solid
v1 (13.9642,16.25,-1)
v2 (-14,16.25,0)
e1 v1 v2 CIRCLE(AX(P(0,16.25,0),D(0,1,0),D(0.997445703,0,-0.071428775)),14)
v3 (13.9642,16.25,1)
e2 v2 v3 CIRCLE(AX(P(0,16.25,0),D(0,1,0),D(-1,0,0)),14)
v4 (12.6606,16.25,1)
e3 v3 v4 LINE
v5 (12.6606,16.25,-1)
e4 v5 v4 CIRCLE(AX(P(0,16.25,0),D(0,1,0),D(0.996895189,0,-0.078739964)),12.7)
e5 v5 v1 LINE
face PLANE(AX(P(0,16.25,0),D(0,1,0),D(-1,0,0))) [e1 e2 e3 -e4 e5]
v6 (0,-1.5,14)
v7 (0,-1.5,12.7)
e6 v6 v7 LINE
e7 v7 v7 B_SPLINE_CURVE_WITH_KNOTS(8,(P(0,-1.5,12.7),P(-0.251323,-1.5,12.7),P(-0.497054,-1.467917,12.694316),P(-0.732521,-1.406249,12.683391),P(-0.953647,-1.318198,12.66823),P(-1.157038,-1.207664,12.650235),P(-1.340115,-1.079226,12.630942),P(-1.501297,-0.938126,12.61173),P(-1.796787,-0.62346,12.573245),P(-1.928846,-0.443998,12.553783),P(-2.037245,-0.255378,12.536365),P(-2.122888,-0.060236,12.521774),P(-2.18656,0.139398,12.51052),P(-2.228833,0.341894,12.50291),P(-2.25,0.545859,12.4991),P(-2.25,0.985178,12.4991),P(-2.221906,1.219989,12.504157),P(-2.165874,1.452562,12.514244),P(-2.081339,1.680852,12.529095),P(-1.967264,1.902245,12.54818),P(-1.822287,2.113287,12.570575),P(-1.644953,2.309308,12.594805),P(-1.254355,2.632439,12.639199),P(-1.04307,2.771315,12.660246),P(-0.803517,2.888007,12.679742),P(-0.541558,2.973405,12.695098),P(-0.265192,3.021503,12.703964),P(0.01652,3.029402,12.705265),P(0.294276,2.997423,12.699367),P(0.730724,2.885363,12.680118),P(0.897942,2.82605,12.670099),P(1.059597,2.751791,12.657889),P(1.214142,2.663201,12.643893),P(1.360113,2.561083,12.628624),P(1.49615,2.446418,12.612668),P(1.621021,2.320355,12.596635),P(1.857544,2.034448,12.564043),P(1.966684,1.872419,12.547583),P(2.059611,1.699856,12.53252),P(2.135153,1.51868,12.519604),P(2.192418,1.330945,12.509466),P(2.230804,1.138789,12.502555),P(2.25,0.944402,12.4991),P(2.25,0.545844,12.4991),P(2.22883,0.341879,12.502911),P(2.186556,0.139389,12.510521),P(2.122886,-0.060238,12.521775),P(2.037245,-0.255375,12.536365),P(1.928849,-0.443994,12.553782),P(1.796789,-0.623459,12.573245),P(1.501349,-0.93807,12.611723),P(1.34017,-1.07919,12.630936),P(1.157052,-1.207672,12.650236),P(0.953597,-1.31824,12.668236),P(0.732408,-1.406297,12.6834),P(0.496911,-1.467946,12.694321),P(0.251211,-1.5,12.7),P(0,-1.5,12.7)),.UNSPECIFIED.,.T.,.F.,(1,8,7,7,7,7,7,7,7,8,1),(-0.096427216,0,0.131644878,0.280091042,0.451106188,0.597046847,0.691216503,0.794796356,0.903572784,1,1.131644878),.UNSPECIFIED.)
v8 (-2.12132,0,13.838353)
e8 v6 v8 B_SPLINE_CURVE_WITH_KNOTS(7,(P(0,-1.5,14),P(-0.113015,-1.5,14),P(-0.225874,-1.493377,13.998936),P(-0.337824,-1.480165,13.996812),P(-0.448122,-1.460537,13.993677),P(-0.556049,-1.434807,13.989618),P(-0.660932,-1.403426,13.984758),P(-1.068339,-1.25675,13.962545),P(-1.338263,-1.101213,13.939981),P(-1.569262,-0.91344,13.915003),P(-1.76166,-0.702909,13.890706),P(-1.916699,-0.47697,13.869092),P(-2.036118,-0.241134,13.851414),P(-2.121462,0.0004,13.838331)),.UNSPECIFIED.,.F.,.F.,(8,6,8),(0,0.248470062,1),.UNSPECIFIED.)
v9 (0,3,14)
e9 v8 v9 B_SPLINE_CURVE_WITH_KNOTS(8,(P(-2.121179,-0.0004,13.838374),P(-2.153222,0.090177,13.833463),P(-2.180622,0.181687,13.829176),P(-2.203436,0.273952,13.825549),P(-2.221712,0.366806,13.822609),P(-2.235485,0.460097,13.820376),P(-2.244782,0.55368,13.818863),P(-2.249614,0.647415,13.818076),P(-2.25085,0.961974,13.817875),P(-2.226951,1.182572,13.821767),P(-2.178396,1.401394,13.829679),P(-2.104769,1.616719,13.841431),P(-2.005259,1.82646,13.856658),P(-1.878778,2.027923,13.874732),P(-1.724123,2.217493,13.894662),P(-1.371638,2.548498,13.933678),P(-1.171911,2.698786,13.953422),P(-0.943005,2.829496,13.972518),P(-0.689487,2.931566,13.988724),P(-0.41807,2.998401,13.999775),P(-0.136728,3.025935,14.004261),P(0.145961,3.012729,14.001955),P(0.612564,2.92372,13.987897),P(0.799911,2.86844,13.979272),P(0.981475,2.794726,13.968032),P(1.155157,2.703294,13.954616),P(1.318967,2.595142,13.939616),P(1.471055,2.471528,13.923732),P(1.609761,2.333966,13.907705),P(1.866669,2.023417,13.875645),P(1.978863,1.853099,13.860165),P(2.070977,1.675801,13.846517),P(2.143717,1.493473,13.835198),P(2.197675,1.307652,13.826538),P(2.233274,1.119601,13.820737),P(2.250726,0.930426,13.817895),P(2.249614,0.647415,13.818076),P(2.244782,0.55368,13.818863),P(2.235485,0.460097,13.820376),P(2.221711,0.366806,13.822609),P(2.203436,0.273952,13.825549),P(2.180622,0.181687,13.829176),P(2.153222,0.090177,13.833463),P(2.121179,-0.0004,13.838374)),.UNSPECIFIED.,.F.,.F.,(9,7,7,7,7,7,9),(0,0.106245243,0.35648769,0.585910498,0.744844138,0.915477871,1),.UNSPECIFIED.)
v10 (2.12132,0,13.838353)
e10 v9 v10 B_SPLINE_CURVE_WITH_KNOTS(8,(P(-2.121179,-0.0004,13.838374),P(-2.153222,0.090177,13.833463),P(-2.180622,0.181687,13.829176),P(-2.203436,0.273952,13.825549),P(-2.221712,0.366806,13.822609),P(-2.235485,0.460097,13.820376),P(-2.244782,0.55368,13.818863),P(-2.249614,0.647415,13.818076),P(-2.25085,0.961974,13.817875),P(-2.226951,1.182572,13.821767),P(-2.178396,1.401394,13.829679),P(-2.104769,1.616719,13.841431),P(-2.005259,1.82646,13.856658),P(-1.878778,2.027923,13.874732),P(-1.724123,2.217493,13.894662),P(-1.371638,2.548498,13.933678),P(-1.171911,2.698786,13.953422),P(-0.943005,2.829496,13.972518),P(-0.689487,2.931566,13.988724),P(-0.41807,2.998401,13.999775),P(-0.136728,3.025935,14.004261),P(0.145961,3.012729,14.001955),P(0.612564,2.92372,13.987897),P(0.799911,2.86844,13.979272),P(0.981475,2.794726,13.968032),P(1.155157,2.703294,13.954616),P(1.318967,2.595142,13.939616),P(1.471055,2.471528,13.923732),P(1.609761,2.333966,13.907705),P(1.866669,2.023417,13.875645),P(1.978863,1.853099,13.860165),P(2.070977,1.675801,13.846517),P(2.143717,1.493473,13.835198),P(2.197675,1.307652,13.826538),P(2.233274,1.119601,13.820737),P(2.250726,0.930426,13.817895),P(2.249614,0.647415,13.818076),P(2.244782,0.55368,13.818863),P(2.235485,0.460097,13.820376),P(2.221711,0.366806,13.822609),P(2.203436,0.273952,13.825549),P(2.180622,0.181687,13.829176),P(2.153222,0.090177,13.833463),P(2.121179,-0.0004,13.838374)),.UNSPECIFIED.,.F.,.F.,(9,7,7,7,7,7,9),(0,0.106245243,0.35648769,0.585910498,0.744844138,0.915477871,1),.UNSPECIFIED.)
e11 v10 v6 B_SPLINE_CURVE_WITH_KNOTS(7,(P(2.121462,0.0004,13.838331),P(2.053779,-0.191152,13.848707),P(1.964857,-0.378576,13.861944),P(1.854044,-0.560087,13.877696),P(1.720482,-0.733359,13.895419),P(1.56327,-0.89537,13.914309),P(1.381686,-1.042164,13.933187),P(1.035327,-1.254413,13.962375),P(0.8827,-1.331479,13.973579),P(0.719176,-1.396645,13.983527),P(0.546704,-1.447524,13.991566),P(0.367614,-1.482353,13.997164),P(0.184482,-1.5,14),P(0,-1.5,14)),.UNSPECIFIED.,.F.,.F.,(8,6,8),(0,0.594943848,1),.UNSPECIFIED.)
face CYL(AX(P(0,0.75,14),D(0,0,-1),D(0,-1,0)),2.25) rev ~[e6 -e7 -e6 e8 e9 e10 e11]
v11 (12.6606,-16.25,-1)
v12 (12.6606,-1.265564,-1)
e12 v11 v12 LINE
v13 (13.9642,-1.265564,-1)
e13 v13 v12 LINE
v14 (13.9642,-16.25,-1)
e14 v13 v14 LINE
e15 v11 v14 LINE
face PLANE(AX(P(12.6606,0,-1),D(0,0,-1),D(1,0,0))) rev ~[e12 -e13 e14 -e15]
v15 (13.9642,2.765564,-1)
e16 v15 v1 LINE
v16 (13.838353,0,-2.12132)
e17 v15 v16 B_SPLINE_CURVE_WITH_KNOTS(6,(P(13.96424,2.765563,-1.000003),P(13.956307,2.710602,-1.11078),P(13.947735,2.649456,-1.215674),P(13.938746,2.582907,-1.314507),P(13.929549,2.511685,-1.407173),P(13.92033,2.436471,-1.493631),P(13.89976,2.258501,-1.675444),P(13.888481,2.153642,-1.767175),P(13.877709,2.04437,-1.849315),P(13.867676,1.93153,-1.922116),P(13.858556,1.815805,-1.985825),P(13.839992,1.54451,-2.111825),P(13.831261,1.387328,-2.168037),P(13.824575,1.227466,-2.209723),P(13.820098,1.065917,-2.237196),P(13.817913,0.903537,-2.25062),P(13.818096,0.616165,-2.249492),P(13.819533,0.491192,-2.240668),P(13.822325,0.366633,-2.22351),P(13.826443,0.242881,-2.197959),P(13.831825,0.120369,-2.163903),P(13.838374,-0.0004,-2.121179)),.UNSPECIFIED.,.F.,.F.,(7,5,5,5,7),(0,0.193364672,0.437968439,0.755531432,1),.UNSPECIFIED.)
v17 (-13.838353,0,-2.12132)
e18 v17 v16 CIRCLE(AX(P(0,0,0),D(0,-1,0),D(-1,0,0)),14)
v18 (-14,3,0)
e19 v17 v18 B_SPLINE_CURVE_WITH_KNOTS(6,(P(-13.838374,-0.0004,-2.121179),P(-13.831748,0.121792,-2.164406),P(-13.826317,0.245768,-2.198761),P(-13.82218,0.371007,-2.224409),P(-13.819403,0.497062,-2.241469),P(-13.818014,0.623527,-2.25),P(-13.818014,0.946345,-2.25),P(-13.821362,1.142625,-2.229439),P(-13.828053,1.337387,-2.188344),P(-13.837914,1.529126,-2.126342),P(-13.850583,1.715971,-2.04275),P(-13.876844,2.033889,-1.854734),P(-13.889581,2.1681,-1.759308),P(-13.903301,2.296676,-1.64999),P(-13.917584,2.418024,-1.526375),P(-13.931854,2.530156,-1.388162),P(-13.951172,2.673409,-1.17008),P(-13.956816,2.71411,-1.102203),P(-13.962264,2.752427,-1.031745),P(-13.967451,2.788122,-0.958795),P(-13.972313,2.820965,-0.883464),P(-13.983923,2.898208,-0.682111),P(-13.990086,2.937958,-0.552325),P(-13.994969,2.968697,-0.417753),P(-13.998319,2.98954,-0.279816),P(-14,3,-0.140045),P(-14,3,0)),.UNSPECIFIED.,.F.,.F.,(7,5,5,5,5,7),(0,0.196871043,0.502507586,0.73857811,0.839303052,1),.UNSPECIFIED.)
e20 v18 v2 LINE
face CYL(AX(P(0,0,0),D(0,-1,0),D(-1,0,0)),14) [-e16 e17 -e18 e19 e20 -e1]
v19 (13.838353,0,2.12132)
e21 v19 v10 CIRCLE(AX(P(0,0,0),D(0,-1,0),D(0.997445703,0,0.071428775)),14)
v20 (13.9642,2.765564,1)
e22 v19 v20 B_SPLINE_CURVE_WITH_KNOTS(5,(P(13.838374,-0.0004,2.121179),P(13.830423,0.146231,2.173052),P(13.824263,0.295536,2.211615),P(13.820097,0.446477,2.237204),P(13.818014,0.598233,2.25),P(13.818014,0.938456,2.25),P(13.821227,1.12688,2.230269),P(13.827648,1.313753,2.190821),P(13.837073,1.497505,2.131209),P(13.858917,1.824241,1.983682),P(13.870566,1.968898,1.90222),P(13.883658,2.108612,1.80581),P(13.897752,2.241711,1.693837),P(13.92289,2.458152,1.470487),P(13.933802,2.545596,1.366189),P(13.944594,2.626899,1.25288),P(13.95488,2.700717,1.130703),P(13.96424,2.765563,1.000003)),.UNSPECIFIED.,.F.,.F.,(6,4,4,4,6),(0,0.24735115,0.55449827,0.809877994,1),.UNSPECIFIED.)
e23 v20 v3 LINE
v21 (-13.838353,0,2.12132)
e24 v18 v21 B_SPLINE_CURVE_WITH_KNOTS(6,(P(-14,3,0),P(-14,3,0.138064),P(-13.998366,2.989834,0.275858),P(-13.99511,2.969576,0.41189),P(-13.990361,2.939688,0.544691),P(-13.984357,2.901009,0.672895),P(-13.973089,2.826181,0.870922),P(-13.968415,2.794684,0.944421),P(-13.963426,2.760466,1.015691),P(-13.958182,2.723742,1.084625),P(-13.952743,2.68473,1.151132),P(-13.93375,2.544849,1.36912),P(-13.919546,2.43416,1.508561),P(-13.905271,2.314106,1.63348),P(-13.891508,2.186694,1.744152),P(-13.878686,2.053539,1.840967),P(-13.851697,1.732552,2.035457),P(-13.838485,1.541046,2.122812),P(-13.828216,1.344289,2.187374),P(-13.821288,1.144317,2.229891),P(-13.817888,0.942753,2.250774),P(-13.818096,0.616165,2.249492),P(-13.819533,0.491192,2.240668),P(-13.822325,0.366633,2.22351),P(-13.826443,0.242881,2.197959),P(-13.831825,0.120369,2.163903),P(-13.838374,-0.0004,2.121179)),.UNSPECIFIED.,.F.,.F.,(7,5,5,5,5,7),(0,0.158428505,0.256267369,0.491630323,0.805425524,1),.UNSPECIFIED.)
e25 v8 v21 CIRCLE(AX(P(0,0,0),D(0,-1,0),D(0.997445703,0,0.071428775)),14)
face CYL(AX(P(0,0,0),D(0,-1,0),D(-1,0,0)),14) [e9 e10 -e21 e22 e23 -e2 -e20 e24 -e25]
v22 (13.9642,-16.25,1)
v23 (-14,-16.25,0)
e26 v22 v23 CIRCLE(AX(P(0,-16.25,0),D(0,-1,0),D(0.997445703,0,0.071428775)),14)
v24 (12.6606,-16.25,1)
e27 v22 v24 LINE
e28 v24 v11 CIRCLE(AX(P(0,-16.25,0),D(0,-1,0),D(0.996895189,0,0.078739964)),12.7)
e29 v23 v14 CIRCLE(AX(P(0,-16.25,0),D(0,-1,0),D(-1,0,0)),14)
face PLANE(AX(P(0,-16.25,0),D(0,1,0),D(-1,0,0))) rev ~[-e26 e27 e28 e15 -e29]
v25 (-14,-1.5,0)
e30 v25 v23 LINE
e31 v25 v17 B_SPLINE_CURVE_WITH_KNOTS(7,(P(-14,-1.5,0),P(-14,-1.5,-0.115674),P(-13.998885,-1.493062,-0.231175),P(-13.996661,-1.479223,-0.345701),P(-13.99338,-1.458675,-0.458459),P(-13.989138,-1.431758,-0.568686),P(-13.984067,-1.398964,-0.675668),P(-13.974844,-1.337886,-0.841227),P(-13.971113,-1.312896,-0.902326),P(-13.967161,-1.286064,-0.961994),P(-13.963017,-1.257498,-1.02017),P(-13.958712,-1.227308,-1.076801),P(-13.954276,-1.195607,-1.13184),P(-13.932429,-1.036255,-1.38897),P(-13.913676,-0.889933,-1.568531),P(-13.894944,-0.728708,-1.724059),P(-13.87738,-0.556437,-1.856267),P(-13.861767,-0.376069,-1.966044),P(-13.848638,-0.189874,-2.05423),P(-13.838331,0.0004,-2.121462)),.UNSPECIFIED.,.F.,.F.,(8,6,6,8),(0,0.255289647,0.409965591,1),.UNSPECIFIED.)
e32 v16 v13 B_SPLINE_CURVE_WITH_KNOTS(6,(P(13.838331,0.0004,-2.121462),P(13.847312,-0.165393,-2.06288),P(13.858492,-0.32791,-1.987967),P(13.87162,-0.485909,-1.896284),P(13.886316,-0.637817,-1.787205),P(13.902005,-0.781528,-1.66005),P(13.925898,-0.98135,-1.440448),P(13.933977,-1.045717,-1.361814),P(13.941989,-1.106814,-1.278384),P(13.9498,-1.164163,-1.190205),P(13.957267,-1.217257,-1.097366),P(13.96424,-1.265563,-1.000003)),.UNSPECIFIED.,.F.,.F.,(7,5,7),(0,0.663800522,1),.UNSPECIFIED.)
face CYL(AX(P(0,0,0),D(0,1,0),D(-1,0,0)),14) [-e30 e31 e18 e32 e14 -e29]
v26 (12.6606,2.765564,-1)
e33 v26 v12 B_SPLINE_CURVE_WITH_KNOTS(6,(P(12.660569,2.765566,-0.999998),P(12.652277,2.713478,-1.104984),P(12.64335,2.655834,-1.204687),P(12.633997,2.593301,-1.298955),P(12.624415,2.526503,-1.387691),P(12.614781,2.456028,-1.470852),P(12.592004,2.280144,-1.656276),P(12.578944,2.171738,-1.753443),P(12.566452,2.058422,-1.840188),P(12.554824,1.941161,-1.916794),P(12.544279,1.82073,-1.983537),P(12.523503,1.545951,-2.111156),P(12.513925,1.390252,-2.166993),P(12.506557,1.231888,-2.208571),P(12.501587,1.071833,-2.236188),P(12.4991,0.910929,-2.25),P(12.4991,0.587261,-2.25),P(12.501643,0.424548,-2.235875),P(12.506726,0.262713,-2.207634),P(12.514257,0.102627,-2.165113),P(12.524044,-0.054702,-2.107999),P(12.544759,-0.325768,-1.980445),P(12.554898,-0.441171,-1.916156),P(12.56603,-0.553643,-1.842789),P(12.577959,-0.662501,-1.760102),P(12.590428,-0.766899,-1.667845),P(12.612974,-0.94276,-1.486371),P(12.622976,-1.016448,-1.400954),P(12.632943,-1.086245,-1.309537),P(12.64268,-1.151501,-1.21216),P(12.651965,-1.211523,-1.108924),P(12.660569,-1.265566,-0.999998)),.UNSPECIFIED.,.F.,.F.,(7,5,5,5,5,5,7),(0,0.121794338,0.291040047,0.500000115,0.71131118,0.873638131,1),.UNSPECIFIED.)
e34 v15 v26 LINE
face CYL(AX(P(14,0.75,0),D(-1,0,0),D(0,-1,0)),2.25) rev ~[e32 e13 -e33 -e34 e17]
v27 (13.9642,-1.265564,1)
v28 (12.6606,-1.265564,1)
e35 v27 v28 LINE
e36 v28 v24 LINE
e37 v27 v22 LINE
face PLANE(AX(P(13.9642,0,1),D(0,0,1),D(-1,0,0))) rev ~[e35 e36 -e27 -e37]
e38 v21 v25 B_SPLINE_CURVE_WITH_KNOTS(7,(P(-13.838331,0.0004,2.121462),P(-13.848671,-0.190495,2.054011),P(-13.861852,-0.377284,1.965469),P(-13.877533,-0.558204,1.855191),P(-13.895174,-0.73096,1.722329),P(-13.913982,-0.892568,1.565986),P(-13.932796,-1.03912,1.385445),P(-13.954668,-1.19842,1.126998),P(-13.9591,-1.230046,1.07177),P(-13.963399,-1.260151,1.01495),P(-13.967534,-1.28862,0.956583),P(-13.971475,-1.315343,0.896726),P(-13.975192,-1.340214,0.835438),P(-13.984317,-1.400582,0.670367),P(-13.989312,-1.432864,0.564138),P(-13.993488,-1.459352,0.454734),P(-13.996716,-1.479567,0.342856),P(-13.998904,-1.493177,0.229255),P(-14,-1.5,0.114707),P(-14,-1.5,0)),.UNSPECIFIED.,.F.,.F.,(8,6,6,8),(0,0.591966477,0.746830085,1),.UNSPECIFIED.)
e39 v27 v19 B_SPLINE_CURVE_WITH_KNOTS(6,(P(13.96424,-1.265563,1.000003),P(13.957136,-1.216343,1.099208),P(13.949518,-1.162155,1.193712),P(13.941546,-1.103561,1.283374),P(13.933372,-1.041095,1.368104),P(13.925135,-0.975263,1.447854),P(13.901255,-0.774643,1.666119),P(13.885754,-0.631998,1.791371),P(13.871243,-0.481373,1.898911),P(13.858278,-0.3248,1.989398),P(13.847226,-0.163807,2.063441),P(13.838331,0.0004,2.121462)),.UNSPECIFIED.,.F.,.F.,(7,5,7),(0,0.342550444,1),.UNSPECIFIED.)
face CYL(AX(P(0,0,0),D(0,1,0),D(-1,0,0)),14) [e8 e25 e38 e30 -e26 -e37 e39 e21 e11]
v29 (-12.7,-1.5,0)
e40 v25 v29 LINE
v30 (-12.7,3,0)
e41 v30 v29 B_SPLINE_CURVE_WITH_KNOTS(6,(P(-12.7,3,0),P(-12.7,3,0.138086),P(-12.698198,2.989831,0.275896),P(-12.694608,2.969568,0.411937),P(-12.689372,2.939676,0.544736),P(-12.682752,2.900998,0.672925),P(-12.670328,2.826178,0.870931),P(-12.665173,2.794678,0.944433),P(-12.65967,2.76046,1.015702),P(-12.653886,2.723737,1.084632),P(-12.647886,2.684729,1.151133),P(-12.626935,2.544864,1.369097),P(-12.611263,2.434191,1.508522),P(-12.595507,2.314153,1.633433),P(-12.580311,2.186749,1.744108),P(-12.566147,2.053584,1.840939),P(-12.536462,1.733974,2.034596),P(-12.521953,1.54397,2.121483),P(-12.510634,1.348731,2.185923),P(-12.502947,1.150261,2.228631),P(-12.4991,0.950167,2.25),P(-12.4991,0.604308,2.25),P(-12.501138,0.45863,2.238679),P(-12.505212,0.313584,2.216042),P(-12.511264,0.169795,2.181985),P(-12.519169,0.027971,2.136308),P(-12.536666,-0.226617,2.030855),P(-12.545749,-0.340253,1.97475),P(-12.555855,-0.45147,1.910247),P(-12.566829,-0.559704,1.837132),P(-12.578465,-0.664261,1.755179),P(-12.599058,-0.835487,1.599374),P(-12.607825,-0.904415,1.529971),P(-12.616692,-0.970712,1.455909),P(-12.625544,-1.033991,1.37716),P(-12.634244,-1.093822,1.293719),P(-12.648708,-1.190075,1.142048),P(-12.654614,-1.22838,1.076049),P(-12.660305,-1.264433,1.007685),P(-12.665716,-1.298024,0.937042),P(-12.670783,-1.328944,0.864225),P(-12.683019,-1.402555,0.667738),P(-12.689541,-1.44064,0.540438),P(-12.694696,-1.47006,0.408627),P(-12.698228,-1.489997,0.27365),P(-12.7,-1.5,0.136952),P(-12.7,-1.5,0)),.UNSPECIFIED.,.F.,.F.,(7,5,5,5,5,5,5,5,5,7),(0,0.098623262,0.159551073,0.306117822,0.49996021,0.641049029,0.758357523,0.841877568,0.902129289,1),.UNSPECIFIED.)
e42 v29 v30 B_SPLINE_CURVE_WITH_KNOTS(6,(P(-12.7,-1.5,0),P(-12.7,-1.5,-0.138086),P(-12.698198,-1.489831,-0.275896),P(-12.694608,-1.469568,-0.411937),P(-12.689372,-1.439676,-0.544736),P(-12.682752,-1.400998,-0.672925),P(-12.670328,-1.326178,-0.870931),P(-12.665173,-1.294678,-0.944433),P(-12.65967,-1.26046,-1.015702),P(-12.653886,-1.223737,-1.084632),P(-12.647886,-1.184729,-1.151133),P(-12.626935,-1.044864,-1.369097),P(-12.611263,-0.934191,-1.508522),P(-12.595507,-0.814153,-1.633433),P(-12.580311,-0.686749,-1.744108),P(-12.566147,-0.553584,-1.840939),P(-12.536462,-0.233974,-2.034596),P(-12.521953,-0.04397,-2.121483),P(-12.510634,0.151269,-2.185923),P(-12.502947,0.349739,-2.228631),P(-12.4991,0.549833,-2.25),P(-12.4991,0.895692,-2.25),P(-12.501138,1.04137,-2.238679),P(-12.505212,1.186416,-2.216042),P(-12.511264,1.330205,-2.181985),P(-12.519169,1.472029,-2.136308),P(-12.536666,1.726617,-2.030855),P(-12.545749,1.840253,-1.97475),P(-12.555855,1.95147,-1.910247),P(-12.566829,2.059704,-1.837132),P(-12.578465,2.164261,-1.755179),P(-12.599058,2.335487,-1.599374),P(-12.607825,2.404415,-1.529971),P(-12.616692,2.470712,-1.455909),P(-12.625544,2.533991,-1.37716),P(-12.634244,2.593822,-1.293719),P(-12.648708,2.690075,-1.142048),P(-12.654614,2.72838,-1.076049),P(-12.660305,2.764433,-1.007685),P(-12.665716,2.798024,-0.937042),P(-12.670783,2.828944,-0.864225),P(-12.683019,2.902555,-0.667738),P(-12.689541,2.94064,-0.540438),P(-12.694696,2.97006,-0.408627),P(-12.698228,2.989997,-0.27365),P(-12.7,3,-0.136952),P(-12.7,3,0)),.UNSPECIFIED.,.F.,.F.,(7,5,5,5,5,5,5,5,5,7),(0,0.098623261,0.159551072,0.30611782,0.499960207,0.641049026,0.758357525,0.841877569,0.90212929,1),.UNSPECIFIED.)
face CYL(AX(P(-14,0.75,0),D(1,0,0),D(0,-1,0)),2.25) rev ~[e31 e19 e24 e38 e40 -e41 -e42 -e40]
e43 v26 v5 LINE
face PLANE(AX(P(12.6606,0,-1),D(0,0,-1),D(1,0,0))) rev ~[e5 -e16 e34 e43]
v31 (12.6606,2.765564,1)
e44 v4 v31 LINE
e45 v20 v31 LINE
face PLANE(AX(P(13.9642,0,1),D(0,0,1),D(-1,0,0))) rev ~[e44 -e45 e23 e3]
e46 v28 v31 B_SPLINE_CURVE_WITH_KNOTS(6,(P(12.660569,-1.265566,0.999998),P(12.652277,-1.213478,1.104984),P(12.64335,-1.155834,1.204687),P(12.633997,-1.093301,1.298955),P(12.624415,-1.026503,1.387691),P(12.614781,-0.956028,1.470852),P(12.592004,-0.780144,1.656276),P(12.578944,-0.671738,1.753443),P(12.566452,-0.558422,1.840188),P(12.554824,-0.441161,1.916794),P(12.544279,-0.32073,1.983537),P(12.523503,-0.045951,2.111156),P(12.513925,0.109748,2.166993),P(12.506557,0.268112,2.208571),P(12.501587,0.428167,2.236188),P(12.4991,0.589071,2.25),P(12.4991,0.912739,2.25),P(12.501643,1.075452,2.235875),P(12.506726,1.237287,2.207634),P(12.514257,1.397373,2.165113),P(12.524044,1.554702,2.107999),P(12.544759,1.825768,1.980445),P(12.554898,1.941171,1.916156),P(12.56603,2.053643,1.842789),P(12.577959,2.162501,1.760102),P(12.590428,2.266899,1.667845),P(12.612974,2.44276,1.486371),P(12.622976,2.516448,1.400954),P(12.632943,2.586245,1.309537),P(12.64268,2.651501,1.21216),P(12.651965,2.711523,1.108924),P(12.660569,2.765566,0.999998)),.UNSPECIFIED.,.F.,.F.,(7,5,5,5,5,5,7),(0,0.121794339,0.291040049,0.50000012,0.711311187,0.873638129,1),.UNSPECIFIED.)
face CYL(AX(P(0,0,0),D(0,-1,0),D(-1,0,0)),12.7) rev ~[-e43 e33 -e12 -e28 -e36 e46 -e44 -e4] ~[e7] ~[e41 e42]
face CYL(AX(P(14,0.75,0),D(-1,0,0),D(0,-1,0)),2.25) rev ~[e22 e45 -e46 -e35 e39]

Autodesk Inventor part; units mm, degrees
ref_plane "YZ Plane" through (0, 0, 0) normal (1, 0, 0) x (0, 1, 0)
ref_plane "XZ Plane" through (0, 0, 0) normal (0, 1, 0) x (-1, 0, 0)
sketch "Sketch2" plane through (0, 0, 0) normal (0, 1, 0) x (-1, 0, 0)
  circle A0 centre (0, 0) radius 14
  circle A1 centre (0, 0) radius 12.7
  line L0 (0, -19.6) -> (0, 19.6) projected
  line L1 (-12.6606, -1) -> (-13.9642, -1)
  line L2 (-13.9642, 1) -> (-12.6606, 1)
  line L3 (19.6, 0) -> (-19.6, 0) projected
  dimension "d3" = 25.4
  dimension "d4" = 28
  dimension "d19" = 2
  dimension "d20" = 1.3
extrude "Extrusion1" add sketch "Sketch2" along normal mid plane 32.5 contours L3 A1 L0 A0 | A0 L0 A1 L3 | L0 A1 L2 A0 | A0 L1 A1 L0
ref_plane "Work Plane1" through (0, 0, 14) normal (0, 0, 1) x (1, 0, 0)
sketch "Sketch3" plane through (0, 0, 14) normal (0, 0, 1) x (1, 0, 0)
  line L0 (-14, -16.25) -> (13.9642, -16.25) projected
  line L1 (0, -22.75) -> (0, 22.75) projected
  point P0 (0, 0)
  point P1 (0, 0.75)
  dimension "d8" = 17
hole "Hole1" at (0, 0.75, 14) direction (0, 0, -1) diameter 4.5 depth 10 clearance for "Socket Head Cap Screw DIN EN ISO 4762" size "M4" standard "DIN"
pattern_circular "Circular Pattern1" count 3 over 180 about axis through (0, -10, 0) along (0, 1, 0) of "Hole1" both ways yes
properties part number "Test_Blade_Holder"
